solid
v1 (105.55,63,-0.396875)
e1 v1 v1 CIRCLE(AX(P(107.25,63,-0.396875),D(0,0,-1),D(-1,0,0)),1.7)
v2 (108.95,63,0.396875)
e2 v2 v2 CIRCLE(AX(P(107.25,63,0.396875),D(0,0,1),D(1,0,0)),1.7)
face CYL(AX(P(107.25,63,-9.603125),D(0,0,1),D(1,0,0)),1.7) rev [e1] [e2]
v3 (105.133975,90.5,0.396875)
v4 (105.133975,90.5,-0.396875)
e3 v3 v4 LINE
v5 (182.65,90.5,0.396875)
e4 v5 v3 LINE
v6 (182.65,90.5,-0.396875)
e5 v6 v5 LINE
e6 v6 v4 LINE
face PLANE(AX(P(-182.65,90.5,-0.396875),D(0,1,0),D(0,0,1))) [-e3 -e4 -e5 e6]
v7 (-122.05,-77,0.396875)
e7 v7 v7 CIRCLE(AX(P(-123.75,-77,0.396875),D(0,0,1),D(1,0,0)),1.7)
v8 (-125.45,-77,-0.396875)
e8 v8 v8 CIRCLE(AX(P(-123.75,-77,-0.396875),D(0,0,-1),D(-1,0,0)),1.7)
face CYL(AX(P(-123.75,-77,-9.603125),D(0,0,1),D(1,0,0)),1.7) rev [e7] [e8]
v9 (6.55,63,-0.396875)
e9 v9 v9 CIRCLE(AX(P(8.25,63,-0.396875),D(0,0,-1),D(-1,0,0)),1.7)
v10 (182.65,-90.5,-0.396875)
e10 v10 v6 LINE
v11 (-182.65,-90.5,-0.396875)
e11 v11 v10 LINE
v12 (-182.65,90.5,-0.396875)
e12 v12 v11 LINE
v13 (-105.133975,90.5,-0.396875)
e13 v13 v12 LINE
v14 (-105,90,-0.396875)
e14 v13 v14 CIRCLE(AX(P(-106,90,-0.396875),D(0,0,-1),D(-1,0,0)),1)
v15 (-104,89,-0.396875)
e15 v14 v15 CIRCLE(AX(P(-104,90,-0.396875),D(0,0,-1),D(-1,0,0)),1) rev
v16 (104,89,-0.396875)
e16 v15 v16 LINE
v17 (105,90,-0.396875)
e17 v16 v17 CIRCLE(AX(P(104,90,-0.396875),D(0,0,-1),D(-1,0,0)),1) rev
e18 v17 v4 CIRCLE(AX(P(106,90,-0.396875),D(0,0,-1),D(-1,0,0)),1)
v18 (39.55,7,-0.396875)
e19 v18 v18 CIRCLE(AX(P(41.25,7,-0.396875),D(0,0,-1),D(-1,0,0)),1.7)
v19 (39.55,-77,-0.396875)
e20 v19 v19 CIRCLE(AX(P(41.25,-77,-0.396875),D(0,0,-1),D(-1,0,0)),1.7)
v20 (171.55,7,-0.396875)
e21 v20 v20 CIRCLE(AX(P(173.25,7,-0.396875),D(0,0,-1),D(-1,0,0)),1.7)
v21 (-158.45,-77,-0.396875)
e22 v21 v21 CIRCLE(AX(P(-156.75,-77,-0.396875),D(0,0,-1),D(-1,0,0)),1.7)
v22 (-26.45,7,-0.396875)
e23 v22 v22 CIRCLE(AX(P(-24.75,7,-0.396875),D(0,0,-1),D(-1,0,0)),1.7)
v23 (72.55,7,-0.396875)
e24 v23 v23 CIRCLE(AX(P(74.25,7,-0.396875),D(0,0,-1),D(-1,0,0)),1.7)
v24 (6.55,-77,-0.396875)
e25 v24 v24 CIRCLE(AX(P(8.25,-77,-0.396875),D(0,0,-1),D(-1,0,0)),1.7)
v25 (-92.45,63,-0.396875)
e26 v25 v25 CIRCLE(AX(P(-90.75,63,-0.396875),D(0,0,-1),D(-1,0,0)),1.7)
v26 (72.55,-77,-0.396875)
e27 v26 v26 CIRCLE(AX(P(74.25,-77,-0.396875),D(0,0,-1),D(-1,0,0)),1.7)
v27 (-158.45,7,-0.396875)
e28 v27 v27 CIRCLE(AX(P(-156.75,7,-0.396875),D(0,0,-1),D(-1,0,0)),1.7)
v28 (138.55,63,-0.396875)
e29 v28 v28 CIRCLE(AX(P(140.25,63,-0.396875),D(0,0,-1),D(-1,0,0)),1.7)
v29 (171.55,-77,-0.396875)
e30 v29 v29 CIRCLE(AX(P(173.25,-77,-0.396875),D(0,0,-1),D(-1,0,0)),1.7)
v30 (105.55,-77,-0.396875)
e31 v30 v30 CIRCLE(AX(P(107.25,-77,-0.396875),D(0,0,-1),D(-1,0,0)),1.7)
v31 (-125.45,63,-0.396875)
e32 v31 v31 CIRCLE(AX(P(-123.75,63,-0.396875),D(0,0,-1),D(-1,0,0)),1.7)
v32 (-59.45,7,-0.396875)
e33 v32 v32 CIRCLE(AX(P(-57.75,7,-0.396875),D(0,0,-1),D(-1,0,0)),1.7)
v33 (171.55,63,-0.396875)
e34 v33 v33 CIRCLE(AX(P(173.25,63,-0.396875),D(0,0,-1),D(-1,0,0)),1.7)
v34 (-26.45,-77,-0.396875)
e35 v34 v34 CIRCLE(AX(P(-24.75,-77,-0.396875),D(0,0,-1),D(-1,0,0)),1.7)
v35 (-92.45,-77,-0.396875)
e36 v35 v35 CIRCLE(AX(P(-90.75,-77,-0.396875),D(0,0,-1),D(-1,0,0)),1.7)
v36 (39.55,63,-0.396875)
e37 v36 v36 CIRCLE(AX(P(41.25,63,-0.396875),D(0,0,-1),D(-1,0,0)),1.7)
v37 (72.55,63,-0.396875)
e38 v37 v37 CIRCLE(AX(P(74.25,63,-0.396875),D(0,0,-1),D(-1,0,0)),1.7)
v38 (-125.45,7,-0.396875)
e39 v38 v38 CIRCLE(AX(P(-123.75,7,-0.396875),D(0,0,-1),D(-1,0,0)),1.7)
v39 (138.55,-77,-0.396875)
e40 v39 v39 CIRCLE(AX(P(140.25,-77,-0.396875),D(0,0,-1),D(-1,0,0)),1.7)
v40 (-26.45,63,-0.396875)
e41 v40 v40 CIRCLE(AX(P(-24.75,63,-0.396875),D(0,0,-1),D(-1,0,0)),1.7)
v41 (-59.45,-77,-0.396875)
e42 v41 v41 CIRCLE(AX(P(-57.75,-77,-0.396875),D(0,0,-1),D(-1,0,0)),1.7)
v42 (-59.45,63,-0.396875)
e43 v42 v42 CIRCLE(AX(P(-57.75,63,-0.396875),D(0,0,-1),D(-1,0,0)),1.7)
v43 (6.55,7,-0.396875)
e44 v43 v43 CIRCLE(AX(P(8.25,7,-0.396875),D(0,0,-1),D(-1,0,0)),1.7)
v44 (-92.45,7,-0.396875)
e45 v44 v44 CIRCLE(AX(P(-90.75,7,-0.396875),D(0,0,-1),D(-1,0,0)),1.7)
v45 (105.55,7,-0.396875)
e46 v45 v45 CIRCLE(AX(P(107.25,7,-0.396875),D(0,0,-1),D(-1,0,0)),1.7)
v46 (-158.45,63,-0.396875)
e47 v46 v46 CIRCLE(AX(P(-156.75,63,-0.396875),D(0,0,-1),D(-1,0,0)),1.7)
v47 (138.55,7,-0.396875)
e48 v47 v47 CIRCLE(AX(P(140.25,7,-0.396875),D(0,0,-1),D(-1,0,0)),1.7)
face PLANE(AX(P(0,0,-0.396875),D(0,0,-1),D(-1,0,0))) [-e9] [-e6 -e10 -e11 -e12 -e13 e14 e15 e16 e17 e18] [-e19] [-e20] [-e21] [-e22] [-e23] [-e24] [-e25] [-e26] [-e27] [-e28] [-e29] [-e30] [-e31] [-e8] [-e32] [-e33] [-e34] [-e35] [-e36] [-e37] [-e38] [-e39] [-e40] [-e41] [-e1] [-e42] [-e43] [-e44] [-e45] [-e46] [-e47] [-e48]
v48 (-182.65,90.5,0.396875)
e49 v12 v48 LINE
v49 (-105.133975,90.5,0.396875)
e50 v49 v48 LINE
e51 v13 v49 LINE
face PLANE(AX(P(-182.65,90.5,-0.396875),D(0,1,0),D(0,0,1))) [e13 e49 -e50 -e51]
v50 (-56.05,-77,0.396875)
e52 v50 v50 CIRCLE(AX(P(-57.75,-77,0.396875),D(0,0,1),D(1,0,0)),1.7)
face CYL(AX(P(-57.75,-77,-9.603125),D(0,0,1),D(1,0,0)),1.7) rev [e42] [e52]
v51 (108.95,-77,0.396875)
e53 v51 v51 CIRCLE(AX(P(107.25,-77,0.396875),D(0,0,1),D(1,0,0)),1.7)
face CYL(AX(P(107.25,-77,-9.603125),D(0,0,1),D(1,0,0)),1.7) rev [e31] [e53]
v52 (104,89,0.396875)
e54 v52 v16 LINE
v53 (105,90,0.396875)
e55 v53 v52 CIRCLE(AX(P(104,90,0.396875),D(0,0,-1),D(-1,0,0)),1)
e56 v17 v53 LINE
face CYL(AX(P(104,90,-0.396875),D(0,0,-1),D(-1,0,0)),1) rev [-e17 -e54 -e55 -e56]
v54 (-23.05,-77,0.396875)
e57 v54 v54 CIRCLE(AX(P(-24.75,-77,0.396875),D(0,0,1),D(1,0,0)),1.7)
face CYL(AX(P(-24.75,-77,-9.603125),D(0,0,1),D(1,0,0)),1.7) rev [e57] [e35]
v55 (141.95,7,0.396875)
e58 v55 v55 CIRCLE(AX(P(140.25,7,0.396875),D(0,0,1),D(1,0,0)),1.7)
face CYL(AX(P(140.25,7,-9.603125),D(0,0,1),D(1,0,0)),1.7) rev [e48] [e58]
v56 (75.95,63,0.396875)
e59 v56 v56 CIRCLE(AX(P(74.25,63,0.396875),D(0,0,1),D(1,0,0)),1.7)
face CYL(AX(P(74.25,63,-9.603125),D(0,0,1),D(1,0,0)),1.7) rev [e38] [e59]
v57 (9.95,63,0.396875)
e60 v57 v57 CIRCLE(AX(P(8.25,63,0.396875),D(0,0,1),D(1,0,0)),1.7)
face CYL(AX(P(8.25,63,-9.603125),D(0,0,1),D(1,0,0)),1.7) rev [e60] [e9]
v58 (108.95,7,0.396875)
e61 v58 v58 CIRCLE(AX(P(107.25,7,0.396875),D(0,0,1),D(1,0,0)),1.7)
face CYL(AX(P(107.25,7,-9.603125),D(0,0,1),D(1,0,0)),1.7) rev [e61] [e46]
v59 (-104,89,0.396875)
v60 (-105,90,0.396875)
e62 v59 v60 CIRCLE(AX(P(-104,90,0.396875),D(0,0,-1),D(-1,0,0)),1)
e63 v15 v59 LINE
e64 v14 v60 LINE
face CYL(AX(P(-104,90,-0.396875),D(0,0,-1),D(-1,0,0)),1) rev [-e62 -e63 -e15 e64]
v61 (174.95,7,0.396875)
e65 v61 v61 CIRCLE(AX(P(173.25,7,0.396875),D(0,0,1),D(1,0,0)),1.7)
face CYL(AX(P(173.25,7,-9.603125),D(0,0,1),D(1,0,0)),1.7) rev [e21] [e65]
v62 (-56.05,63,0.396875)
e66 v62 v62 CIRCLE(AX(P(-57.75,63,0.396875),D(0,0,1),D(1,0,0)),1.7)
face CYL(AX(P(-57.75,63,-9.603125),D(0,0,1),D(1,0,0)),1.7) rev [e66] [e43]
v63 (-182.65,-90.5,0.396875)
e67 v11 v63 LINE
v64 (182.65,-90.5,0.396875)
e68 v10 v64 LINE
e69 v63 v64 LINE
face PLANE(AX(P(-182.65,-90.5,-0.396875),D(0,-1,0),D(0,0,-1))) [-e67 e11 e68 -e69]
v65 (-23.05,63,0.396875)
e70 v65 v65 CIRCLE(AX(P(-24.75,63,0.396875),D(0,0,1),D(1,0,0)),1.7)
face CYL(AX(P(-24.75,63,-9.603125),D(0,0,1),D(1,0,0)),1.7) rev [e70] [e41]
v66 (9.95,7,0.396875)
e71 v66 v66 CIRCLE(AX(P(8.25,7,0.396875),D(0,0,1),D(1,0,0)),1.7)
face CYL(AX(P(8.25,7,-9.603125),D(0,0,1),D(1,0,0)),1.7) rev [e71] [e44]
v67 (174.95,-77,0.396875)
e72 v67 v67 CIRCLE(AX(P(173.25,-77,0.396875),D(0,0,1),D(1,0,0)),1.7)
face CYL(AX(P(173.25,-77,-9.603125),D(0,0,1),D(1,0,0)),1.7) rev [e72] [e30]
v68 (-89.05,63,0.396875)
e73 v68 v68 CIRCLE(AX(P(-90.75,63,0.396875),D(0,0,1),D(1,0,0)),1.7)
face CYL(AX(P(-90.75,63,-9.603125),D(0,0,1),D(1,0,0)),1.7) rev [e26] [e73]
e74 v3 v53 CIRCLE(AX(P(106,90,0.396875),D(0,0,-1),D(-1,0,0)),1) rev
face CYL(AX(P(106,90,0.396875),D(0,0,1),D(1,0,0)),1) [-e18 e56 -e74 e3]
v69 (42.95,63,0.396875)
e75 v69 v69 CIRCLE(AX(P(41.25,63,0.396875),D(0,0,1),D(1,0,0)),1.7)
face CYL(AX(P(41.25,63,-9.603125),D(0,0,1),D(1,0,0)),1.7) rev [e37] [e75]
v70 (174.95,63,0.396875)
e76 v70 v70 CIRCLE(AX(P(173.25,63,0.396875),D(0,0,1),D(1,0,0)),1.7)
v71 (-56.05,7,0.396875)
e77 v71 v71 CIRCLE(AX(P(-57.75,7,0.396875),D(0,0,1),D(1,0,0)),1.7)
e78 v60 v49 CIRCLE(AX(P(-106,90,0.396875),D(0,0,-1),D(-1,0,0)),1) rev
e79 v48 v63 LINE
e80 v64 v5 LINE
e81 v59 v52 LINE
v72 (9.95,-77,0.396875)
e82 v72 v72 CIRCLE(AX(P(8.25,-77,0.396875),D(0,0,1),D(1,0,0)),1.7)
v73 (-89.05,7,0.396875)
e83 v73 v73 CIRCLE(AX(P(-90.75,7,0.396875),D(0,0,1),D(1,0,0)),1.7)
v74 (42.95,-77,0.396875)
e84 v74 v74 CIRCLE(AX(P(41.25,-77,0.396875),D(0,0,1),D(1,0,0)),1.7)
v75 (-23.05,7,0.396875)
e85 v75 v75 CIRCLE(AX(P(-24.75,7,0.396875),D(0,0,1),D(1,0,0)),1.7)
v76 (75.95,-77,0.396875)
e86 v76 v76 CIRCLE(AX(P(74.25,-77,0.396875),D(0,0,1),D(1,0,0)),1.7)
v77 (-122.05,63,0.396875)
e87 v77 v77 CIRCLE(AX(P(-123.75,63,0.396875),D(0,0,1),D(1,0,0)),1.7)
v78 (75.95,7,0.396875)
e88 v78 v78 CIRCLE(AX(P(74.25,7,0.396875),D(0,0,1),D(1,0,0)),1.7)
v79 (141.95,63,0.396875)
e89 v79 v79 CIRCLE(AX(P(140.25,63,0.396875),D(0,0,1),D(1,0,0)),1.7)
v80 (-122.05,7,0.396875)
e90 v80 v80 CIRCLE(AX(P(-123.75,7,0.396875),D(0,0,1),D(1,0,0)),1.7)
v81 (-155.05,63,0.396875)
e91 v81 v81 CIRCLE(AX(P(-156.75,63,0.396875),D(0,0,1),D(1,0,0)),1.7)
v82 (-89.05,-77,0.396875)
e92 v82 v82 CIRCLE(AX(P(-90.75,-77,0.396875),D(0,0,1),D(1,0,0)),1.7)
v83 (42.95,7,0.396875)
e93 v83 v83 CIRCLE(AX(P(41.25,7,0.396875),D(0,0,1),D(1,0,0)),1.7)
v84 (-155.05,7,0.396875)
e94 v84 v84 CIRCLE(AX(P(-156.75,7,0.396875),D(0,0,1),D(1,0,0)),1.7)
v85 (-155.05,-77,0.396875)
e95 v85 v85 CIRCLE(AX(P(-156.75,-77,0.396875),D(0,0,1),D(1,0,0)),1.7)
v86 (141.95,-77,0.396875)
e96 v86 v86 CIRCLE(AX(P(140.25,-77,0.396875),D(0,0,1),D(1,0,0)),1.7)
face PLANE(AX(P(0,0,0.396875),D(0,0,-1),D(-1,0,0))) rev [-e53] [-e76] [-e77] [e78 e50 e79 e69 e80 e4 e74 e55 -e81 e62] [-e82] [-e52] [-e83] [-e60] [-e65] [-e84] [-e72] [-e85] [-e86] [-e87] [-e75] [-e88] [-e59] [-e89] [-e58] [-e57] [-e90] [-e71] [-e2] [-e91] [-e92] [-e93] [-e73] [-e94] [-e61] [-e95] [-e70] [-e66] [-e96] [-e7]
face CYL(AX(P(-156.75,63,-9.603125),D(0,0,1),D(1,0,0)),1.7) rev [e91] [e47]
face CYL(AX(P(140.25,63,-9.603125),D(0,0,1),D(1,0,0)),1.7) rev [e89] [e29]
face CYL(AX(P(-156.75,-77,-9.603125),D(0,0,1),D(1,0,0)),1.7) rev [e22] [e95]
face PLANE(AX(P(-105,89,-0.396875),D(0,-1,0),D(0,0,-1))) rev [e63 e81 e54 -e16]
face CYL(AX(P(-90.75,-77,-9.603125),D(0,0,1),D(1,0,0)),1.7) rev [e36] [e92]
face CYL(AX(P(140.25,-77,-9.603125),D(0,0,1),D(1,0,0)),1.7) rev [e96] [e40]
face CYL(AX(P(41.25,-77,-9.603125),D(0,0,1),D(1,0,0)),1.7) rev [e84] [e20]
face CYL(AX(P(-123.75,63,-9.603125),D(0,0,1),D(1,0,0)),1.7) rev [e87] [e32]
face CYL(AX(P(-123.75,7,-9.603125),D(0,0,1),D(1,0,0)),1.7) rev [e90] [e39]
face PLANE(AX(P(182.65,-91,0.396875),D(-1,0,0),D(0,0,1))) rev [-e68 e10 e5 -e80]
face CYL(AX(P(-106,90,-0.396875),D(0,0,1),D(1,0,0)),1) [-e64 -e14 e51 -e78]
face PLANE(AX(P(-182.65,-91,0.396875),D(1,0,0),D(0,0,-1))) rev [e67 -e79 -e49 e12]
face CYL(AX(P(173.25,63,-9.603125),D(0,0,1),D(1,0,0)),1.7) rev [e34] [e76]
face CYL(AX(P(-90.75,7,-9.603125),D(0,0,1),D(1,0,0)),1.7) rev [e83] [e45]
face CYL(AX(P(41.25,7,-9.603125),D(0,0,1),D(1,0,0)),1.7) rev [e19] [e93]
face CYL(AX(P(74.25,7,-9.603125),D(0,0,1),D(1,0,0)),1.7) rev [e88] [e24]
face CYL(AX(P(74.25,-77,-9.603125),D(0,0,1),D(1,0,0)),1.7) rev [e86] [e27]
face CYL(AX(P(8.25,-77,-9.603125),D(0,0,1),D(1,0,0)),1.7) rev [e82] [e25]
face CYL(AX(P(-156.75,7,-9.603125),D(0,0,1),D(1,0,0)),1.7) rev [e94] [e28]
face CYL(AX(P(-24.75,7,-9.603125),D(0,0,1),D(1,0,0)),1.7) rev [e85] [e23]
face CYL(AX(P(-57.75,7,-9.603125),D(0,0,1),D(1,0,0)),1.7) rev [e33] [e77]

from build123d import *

# Parameters (mm, degrees)
ESQUISSE1_W                = 365.3
ESQUISSE1_H                = 182
BOSS_EXTRU_1_DEPTH         = 0.396875
ESQUISSE2_R                = 1.7
ENL_V_MAT_EXTRU_1_DEPTH    = 10
R_P_TITION_LIN_AIRE1_COUNT = 11
R_P_TITION_LIN_AIRE1_PITCH = 33
ESQUISSE3_W                = 210
ESQUISSE3_H                = 2
ENL_V_MAT_EXTRU_2_DEPTH    = 205.065314395
CONG_1_R                   = 1
ESQUISSE4_OUTSIDE_W        = 448.926
ESQUISSE4_OUTSIDE_H        = 265.626
ESQUISSE4_OUTSIDE_W_2      = 365.3
ESQUISSE4_OUTSIDE_H_2      = 181
ENL_V_MAT_EXTRU_3_DEPTH    = 205.065314395


with BuildPart() as part:
    # Esquisse1 → Boss.-Extru.1 (new, symmetric)
    with BuildSketch(Plane.XY):
        Rectangle(ESQUISSE1_W, ESQUISSE1_H)
    extrude(amount=BOSS_EXTRU_1_DEPTH, both=True)

    # Esquisse2 → Enlèv. mat.-Extru.1 (cut)
    with BuildSketch(Plane.XY.offset(0.396875)):
        with Locations((-156.75, 63)):
            Circle(ESQUISSE2_R)
        with Locations((-156.75, 7)):
            Circle(ESQUISSE2_R)
        with Locations((-156.75, -77)):
            Circle(ESQUISSE2_R)
    enl_v_mat_extru_1 = extrude(amount=-ENL_V_MAT_EXTRU_1_DEPTH, mode=Mode.SUBTRACT)

    # Répétition linéaire1: Enlèv. mat.-Extru.1 ×11
    with Locations(*[(i * R_P_TITION_LIN_AIRE1_PITCH, 0, 0) for i in range(1, R_P_TITION_LIN_AIRE1_COUNT)]):
        add(enl_v_mat_extru_1, mode=Mode.SUBTRACT)

    # Esquisse3 → Enlèv. mat.-Extru.2 (cut, through all)
    with BuildSketch(Plane.XY.offset(0.396875)):
        with Locations((0, 90)):
            Rectangle(ESQUISSE3_W, ESQUISSE3_H)
    extrude(amount=-ENL_V_MAT_EXTRU_2_DEPTH, mode=Mode.SUBTRACT)

    # Congé1
    cong_1_edges = [part.edges().sort_by_distance(p)[0] for p in [
        (105, 89, 0),
        (-105, 89, 0),
    ]]
    fillet(cong_1_edges, radius=CONG_1_R)
    cong_1_2_edges = [part.edges().sort_by_distance(p)[0] for p in [
        (105, 91, 0),
        (-105, 91, 0),
    ]]
    fillet(cong_1_2_edges, radius=CONG_1_R - 0.0001)  # a hair under: the kernel refuses the full size

    # Esquisse4 outside → Enlèv. mat.-Extru.3 (cut, through all)
    with BuildSketch(Plane.XY.offset(0.396875)):
        Rectangle(ESQUISSE4_OUTSIDE_W, ESQUISSE4_OUTSIDE_H)
        Rectangle(ESQUISSE4_OUTSIDE_W_2, ESQUISSE4_OUTSIDE_H_2, mode=Mode.SUBTRACT)
    extrude(amount=-ENL_V_MAT_EXTRU_3_DEPTH, mode=Mode.SUBTRACT)


solid = part.part
